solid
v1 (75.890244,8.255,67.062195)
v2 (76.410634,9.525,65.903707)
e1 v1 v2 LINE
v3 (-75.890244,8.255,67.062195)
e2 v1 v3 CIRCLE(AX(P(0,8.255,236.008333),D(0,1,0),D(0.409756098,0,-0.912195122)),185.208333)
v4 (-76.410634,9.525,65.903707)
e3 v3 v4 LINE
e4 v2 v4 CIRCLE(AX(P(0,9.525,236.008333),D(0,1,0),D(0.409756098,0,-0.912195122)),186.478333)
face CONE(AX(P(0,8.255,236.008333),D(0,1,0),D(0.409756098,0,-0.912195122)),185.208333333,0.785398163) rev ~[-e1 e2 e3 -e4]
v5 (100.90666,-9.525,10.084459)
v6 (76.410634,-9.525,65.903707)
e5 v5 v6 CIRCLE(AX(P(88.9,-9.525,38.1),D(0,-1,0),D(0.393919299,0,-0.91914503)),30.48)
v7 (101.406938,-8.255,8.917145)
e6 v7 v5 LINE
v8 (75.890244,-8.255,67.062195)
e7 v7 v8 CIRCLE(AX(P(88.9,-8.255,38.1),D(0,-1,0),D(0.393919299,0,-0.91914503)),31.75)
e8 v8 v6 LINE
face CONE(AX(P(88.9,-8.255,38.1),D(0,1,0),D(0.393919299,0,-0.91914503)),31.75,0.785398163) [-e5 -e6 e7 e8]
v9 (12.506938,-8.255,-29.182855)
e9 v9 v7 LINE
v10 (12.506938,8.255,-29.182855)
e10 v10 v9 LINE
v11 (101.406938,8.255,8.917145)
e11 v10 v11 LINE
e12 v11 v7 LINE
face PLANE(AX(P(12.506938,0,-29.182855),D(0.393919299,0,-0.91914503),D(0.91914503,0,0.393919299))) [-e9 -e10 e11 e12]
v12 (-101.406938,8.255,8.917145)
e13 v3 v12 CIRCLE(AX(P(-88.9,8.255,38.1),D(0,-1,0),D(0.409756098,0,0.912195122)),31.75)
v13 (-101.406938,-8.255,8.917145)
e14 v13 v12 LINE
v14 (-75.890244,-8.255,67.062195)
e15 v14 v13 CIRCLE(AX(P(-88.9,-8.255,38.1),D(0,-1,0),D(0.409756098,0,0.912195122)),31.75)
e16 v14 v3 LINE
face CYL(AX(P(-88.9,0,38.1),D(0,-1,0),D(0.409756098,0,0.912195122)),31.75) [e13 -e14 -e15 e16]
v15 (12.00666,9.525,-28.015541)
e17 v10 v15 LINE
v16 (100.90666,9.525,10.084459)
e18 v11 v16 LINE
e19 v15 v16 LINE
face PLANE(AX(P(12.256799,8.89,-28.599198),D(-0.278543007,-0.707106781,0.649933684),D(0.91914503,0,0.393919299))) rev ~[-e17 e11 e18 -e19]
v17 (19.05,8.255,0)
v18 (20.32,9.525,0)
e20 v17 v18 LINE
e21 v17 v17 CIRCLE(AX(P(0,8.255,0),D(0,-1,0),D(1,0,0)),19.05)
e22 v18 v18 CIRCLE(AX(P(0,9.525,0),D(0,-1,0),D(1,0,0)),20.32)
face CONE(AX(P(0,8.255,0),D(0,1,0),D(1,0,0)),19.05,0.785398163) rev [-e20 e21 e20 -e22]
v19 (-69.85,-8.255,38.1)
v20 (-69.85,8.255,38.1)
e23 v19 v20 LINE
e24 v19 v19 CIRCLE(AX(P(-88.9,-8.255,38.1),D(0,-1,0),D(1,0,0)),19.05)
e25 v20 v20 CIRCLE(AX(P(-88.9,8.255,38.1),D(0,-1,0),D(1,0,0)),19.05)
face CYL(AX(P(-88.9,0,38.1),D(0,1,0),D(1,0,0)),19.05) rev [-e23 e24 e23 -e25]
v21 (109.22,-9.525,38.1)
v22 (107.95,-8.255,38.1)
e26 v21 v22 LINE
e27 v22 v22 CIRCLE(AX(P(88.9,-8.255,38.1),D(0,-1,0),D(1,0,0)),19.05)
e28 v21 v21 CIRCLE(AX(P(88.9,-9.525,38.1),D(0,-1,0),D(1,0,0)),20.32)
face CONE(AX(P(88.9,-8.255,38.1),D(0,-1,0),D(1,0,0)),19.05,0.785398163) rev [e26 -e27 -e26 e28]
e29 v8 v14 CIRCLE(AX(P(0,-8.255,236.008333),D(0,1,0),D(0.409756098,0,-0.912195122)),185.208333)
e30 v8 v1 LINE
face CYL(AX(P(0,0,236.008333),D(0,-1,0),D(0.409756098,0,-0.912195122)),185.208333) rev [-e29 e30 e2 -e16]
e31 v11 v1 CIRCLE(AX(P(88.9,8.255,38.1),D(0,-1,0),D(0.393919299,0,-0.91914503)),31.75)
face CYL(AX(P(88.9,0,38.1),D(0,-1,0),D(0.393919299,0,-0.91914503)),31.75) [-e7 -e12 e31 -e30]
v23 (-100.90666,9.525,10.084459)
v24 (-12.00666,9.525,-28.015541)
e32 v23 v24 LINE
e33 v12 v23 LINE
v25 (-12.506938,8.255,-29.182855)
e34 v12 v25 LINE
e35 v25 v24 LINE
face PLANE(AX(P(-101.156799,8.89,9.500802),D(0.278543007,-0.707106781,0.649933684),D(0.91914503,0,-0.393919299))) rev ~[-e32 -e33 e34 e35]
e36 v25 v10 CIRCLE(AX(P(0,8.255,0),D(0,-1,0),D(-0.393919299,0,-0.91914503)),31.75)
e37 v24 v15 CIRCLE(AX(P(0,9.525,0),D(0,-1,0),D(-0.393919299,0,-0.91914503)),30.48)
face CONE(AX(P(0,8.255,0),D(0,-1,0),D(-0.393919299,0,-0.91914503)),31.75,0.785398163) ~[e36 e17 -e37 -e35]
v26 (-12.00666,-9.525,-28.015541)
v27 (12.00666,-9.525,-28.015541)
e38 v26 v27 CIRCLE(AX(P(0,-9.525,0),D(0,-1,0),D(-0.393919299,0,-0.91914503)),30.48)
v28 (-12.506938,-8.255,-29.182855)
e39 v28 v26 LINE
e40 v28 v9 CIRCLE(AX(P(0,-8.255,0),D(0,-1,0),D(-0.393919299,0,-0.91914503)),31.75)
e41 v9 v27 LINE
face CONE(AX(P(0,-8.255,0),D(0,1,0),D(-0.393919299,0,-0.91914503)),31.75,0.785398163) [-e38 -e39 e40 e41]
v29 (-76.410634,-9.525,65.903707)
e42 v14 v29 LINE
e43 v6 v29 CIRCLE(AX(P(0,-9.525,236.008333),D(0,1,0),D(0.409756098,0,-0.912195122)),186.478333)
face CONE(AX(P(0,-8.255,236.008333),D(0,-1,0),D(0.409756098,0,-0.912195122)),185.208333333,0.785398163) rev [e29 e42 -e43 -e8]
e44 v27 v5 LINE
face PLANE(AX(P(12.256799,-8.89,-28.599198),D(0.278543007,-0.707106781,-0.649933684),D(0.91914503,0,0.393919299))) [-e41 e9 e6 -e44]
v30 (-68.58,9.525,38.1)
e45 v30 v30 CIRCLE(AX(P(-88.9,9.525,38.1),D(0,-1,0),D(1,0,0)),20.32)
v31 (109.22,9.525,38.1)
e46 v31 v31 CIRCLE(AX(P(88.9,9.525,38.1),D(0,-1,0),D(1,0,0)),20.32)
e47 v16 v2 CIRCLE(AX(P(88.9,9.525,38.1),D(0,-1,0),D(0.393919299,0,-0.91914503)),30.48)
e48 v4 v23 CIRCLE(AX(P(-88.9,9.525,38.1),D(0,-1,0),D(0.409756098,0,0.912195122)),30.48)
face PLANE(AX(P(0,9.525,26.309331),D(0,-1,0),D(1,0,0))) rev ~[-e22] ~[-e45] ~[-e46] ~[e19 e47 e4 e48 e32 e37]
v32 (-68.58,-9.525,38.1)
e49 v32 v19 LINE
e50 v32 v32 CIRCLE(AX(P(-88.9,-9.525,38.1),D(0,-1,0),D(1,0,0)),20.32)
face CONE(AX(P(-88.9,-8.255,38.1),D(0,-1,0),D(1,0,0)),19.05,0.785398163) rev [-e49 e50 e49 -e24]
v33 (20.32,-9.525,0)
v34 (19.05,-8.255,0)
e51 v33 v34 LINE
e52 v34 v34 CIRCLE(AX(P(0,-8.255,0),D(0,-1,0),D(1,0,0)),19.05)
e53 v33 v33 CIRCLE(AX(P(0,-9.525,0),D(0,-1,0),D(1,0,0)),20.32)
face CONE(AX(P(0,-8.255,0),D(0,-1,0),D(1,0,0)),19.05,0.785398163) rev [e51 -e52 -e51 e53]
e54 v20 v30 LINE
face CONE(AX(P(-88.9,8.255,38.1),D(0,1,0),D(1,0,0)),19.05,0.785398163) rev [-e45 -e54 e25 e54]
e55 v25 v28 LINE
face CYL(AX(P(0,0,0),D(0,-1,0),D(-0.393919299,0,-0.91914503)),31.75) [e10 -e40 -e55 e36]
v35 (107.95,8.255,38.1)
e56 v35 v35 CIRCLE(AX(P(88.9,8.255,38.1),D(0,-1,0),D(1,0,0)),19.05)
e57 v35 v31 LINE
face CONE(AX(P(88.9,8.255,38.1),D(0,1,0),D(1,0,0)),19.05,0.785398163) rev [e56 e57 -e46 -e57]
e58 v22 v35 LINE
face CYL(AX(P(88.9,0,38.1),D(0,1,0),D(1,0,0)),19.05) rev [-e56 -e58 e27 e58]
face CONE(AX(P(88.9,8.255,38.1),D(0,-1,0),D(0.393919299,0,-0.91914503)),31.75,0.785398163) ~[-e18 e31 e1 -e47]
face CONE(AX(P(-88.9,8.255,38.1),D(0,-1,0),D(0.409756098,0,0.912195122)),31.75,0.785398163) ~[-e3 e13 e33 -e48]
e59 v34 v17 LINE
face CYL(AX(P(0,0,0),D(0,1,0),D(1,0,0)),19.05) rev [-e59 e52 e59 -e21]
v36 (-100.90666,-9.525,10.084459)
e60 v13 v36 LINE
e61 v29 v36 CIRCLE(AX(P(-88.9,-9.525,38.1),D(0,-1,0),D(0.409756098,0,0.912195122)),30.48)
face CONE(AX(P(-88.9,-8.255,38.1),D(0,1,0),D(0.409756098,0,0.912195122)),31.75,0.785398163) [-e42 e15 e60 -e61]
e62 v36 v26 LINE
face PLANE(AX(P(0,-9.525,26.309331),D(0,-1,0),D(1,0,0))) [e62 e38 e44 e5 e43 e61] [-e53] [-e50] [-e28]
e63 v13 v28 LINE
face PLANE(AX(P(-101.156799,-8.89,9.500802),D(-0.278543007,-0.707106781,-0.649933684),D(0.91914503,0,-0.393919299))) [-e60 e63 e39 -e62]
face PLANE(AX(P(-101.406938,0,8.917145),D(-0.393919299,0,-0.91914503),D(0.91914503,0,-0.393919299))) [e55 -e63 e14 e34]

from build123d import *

# Parameters (mm, degrees)
F0_R     = 19.05
F1_DEPTH = 9.525
F2_SIZE  = 1.27


# Not quite as in the source:
# - a feature names something its author has since deleted; it is built from what else it names


with BuildPart() as f1:
    # F0 (on Front) → F1 (new body, symmetric)
    with BuildSketch(Plane.XZ):
        with BuildLine():
            Line((-101.4069377299, 8.9171452969), (-12.5069377299, -29.1828547031))
            ThreePointArc((-12.5069377299, -29.1828547031), (0, -31.75), (12.5069377299, -29.1828547031))
            Line((12.5069377299, -29.1828547031), (101.4069377299, 8.9171452969))
            ThreePointArc((101.4069377299, 8.9171452969), (117.9736119422, 50.8588239518), (75.8902439024, 67.062195122))
            ThreePointArc((75.8902439024, 67.062195122), (0, 50.8), (-75.8902439024, 67.062195122))
            ThreePointArc((-75.8902439024, 67.062195122), (-117.9736119422, 50.8588239518), (-101.4069377299, 8.9171452969))
        make_face()
        Circle(F0_R, mode=Mode.SUBTRACT)
        with Locations((-88.9, 38.1)):
            Circle(F0_R, mode=Mode.SUBTRACT)
        with Locations((88.9, 38.1)):
            Circle(F0_R, mode=Mode.SUBTRACT)
    extrude(amount=F1_DEPTH, both=True)

    # F2
    f2_edges = [f1.edges().sort_by_distance(p)[0] for p in [
        (-117.973612, -9.525, 50.858824),
        (-56.956938, -9.525, -10.132855),
        (0, -9.525, -31.75),
        (56.956938, -9.525, -10.132855),
        (117.973612, -9.525, 50.858824),
        (0, -9.525, 50.8),
        (-56.956938, 9.525, -10.132855),
        (0, 9.525, -31.75),
        (56.956938, 9.525, -10.132855),
        (117.973612, 9.525, 50.858824),
        (0, 9.525, 50.8),
        (-117.973612, 9.525, 50.858824),
        (-19.05, 9.525, 0),
        (-107.95, 9.525, 38.1),
        (69.85, 9.525, 38.1),
        (-19.05, -9.525, 0),
        (-107.95, -9.525, 38.1),
        (69.85, -9.525, 38.1),
    ]]
    chamfer(f2_edges, length=F2_SIZE)


solid = f1.part
